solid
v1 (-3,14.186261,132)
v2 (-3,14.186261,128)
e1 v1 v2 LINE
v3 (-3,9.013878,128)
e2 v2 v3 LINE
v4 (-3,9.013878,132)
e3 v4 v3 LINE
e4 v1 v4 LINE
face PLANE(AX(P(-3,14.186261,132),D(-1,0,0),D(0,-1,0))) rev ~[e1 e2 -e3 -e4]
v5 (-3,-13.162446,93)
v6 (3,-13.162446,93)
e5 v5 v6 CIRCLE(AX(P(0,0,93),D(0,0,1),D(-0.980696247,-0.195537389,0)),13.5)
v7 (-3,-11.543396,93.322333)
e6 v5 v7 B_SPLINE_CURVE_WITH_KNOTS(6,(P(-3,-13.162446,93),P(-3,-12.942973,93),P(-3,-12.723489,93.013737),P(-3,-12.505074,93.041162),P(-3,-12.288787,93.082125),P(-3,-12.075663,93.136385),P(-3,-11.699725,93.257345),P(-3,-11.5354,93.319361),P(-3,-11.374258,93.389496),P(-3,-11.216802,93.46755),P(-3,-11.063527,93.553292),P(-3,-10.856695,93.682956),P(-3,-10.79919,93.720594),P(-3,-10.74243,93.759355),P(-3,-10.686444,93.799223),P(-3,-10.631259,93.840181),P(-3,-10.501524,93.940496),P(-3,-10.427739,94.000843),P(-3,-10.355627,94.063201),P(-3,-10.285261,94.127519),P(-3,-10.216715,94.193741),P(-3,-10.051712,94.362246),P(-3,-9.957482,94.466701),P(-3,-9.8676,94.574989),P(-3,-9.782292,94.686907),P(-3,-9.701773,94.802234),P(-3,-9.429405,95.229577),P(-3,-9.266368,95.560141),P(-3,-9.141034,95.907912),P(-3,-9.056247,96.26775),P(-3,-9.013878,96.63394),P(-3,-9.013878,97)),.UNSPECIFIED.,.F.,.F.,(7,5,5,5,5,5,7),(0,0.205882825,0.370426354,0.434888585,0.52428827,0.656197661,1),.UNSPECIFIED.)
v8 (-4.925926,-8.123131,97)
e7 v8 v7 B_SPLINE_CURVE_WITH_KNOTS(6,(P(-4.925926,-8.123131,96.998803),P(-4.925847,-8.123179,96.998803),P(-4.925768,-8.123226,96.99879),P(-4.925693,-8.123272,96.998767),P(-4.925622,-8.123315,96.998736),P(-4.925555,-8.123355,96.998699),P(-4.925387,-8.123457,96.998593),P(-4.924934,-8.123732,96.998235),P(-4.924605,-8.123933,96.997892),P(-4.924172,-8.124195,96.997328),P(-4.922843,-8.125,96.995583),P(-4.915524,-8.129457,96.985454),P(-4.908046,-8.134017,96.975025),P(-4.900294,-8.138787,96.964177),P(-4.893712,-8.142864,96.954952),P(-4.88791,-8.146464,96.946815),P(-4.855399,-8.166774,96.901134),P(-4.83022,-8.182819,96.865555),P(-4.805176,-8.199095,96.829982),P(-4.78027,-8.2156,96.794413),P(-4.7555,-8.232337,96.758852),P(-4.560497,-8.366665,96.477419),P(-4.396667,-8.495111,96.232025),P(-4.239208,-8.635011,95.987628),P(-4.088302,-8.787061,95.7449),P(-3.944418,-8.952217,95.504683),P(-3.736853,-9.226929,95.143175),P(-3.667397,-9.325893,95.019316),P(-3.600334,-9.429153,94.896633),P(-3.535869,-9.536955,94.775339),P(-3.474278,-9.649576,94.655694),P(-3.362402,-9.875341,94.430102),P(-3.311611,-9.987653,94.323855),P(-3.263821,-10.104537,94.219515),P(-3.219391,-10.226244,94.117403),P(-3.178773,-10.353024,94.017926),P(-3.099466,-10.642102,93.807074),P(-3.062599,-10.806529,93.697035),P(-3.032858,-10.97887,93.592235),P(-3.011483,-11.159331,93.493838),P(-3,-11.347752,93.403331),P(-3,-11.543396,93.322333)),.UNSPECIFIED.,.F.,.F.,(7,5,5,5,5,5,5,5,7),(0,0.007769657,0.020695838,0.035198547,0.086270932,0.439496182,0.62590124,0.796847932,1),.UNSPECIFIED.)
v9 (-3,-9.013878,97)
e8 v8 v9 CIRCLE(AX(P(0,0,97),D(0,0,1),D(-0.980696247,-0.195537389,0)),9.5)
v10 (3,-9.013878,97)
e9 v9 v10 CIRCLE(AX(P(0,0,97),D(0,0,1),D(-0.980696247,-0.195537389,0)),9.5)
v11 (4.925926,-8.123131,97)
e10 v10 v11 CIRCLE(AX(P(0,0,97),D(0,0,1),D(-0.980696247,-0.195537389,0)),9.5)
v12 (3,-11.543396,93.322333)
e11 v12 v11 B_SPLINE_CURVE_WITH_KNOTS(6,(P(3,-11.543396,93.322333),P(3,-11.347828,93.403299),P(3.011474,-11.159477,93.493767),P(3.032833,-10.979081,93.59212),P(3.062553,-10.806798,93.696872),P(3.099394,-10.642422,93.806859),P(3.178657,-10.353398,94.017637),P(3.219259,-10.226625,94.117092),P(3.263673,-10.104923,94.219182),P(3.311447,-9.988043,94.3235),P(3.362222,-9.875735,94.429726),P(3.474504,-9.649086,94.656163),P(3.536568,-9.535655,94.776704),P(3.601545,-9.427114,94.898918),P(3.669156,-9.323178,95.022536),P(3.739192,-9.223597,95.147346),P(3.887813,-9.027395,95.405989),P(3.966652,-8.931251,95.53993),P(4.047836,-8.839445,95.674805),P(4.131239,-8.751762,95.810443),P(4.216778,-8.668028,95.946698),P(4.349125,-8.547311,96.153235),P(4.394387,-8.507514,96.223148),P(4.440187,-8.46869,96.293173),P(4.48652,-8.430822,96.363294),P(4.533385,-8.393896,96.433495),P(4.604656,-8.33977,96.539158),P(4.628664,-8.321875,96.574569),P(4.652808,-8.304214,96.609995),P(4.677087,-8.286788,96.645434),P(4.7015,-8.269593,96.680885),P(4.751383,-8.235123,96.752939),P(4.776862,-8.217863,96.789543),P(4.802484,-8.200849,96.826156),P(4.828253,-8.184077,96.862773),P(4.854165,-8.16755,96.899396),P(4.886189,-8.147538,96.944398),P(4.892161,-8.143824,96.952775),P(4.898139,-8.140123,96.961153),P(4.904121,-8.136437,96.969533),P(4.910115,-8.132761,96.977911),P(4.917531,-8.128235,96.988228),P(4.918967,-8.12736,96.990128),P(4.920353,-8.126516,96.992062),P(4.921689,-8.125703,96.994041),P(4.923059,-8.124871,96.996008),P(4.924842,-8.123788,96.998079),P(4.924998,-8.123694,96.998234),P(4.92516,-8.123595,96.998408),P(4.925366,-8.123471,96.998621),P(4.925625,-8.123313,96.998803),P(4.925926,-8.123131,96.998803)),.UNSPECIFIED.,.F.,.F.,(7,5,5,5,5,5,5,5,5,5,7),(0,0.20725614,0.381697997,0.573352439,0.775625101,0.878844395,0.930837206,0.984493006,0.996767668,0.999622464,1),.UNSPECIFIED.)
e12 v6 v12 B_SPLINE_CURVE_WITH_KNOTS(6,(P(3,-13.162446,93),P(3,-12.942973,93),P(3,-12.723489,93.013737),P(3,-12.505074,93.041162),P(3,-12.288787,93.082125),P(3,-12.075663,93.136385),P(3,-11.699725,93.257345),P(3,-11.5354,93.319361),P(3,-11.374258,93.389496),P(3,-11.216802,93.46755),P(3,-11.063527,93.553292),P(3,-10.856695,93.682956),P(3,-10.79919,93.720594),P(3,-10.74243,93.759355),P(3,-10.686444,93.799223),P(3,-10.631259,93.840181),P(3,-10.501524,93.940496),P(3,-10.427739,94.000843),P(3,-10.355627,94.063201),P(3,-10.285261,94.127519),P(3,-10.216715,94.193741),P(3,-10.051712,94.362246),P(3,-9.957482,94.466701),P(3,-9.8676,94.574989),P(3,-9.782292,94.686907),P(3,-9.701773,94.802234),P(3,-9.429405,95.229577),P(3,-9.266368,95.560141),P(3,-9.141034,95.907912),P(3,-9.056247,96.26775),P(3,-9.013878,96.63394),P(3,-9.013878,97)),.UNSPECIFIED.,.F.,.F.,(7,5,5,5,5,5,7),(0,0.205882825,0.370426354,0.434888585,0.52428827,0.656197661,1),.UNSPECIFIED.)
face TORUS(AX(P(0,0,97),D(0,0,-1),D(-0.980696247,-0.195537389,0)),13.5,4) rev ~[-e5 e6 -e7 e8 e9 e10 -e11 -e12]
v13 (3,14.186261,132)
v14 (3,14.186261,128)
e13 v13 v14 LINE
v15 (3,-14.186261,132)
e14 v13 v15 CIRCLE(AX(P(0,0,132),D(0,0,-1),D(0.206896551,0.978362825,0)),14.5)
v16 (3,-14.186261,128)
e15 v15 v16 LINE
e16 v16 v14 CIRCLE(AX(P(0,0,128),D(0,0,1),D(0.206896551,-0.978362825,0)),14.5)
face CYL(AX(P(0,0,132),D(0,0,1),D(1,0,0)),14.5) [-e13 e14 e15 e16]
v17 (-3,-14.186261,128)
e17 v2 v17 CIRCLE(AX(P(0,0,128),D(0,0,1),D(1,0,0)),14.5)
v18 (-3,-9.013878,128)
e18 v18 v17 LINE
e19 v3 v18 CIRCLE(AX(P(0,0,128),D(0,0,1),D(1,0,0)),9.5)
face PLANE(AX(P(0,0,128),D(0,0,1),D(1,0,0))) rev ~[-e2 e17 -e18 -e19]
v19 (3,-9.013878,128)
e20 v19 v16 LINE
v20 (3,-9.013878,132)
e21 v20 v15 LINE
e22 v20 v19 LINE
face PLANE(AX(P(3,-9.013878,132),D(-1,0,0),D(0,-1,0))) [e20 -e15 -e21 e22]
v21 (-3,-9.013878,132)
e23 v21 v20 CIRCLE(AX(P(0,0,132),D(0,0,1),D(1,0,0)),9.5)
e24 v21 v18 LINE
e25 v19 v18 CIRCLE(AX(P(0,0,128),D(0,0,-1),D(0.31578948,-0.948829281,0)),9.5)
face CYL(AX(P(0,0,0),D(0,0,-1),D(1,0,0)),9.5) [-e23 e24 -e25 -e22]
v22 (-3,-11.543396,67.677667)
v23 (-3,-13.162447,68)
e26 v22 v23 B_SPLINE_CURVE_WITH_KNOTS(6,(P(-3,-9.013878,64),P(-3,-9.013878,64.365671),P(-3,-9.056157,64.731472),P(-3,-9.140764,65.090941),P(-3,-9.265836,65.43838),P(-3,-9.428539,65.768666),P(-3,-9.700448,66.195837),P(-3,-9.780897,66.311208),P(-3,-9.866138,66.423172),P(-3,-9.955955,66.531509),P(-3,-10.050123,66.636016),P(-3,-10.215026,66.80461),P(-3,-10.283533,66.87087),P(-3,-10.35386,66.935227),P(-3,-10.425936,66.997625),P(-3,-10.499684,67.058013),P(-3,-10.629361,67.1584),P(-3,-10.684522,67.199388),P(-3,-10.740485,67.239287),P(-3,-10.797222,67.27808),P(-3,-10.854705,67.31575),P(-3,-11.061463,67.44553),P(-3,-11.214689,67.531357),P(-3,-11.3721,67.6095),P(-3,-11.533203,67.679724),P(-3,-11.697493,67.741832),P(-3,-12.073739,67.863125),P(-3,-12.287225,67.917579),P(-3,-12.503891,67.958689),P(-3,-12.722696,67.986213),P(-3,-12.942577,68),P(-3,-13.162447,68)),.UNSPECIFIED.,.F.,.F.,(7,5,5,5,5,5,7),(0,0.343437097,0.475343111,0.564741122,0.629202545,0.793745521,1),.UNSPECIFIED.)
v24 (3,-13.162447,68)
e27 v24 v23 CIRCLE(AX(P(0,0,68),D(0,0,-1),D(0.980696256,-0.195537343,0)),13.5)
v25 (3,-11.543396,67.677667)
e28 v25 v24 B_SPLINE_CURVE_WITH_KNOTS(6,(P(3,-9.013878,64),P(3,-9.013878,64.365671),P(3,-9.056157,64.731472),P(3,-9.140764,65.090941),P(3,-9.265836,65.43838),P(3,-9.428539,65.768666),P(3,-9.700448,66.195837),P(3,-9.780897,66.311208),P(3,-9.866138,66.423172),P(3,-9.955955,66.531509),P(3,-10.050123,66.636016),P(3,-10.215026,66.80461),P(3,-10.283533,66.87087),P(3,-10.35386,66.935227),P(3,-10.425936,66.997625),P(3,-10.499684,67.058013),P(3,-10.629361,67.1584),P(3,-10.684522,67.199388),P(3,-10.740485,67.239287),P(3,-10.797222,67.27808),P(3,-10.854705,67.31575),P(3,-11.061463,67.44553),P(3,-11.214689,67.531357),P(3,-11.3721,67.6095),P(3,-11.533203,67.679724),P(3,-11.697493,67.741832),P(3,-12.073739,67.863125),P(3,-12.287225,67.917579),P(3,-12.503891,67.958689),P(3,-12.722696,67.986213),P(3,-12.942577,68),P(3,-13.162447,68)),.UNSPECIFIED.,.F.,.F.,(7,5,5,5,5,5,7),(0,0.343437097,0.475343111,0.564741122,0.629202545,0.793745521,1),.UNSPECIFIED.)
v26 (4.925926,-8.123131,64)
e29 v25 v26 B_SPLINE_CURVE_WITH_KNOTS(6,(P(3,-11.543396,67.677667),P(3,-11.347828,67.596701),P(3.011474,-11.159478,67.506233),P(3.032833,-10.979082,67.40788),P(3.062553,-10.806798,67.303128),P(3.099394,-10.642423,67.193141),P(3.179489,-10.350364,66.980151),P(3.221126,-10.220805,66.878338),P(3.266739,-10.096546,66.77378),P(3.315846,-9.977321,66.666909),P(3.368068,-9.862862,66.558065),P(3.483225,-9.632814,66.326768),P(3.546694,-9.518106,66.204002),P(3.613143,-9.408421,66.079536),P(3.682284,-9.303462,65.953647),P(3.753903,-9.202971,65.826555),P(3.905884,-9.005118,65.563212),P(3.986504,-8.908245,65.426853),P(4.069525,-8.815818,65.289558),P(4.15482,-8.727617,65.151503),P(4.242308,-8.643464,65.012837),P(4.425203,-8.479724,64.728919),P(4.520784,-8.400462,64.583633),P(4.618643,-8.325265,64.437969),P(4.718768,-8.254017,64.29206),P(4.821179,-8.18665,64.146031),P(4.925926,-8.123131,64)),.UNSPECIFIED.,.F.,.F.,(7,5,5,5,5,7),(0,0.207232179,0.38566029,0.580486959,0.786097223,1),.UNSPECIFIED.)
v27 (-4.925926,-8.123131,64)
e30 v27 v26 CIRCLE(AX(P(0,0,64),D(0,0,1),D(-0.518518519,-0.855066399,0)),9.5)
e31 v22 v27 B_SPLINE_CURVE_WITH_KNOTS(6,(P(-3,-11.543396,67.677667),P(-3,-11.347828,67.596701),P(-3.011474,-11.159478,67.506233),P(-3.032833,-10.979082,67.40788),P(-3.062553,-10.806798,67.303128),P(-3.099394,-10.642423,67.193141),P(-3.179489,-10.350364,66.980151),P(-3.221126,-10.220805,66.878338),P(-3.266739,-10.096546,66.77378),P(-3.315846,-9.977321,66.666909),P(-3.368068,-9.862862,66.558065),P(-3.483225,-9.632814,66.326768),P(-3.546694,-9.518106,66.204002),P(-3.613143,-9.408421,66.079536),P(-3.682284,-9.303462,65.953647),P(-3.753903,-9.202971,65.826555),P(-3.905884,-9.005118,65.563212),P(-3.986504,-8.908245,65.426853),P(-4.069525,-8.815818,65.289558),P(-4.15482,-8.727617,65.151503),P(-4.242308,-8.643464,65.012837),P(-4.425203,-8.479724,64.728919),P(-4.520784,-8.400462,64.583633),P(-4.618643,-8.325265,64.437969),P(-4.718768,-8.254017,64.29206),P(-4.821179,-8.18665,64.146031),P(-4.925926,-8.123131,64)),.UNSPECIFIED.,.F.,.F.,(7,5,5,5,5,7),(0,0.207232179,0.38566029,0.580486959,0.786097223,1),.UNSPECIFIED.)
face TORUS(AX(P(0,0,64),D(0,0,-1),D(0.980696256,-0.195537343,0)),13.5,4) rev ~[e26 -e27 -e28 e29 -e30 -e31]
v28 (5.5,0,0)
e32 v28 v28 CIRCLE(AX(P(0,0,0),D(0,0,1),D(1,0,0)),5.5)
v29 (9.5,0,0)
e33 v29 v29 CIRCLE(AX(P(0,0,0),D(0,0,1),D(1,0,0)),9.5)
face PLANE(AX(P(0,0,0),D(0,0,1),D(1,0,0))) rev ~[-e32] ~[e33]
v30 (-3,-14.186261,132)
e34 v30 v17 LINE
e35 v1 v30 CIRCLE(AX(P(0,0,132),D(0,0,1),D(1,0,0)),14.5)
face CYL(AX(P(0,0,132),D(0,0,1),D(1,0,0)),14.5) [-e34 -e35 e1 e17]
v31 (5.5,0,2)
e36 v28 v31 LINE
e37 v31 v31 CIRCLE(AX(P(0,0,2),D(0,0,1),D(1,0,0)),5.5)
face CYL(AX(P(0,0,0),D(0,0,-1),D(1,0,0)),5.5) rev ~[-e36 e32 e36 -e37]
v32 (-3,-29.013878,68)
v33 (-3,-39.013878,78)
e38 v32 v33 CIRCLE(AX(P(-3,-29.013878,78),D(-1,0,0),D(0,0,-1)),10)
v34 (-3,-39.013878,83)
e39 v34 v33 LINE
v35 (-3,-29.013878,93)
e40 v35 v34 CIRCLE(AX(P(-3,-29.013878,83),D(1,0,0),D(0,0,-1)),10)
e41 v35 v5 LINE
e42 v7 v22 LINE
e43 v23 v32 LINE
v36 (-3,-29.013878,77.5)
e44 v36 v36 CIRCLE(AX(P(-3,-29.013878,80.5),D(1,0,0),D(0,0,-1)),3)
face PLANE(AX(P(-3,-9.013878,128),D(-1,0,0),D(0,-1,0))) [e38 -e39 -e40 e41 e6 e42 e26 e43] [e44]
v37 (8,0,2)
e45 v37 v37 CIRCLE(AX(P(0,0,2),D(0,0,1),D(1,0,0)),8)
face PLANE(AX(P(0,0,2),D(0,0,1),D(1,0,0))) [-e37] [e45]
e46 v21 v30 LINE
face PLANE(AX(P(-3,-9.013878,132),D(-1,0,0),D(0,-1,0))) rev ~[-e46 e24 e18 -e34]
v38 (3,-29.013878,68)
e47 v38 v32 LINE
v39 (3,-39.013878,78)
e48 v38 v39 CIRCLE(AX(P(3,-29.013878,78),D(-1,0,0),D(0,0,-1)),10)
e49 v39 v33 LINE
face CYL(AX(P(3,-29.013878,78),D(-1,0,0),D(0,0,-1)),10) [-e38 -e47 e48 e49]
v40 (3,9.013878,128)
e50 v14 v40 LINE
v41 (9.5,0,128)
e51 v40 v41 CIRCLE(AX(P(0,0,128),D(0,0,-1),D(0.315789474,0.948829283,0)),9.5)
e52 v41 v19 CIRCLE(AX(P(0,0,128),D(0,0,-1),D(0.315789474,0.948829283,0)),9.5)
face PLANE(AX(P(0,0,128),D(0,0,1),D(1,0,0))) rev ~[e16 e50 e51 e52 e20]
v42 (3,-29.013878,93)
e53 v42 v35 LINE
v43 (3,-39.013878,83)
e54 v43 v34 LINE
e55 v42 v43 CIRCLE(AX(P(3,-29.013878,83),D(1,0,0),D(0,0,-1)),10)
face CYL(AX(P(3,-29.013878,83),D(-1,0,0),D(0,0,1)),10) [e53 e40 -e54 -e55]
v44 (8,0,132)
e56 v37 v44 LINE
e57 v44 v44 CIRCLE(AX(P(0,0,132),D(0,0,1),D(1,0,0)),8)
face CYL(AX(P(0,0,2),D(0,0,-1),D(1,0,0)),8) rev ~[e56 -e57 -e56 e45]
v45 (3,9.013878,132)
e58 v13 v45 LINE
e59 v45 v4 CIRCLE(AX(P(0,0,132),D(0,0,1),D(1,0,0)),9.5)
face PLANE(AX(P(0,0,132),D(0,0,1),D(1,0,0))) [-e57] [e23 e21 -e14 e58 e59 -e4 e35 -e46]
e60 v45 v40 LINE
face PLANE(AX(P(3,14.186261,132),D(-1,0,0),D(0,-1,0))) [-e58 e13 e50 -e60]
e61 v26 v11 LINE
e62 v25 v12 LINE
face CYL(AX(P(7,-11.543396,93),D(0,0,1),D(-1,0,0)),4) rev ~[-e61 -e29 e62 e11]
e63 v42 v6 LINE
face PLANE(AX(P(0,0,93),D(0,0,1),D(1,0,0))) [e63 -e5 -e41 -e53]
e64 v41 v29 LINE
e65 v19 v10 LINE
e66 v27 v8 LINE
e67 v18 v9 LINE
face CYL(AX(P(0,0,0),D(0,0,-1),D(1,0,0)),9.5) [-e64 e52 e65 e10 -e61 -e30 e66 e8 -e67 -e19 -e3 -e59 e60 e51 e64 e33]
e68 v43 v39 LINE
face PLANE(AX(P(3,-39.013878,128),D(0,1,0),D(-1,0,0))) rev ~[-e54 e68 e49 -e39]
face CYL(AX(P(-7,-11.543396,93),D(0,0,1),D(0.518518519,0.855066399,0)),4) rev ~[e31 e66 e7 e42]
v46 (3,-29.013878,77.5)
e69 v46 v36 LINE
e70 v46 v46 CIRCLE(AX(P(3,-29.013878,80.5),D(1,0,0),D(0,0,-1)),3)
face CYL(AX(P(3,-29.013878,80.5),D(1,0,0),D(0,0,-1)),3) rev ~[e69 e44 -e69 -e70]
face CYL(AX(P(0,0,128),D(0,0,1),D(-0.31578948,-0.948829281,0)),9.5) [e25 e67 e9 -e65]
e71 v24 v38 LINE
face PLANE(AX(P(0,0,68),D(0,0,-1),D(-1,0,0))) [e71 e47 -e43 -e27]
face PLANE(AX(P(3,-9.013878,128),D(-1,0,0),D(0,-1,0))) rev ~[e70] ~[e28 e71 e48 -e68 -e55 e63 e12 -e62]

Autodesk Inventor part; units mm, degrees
ref_plane "YZ Plane" through (0, 0, 0) normal (1, 0, 0) x (0, 1, 0)
ref_plane "XZ Plane" through (0, 0, 0) normal (0, 1, 0) x (-1, 0, 0)
ref_plane "XY Plane" through (0, 0, 0) normal (0, 0, 1) x (1, 0, 0)
sketch "Boceto2" plane through (0, 0, 0) normal (0, 0, 1) x (1, 0, 0)
  circle A0 centre (0, 0) radius 9.5
  circle A1 centre (0, 0) radius 5.5
extrude "Extrusión1" add sketch "Boceto2" along normal blind 2
sketch "Boceto3" plane through (0, 0, 2) normal (0, 0, 1) x (1, 0, 0)
  circle A0 centre (0, 0) radius 9.5
  circle A1 centre (0, 0) radius 8
  dimension "d5" = 16
extrude "Extrusión2" add sketch "Boceto3" along normal blind 130
sketch "Boceto4" plane through (0, 0, 132) normal (0, 0, 1) x (1, 0, 0)
  circle A0 centre (0, 0) radius 9.5
  circle A1 centre (0, 0) radius 8
  circle A2 centre (0, 0) radius 14.5
  line L0 (3, 14.186261) -> (3, -14.186261)
  line L1 (-3, 14.186261) -> (-3, -14.186261)
  point P0 (3, 0)
  point P1 (-3, 0)
  point P2 (-3, 9.013878)
  point P3 (-3, -9.013878)
  point P4 (3, -9.013878)
  point P5 (3, 9.013878)
  dimension "d36" = 19
  dimension "d37" = 5
  dimension "d38" = 3
  dimension "d39" = 3
extrude "Extrusión3" add sketch "Boceto4" against normal blind 4 contours A0 L0 A2 | A0 L1 A2
sketch "Boceto5" plane through (0, 0, 128) normal (0, 0, -1) x (-1, 0, 0)
  line L0 (9.380832, 1.5) -> (10.897247, 1.5)
  line L1 (-9.380832, 1.5) -> (-10.897247, 1.5)
  line L2 (-9.380832, -1.5) -> (-10.897247, -1.5)
  line L3 (9.380832, -1.5) -> (10.897247, -1.5)
  arc A0 (-9.380832, 1.5) -> (-9.380832, -1.5) centre (0, 0) ccw
  arc A1 (9.380832, -1.5) -> (9.380832, 1.5) centre (0, 0) ccw
  line L4 (-10.897247, 1.5) -> (-12.409674, 1.5)
  line L5 (-10.897247, -1.5) -> (-12.409674, -1.5)
  line L6 (10.897247, 1.5) -> (12.409674, 1.5)
  line L7 (10.897247, -1.5) -> (12.409674, -1.5)
  arc A2 (-12.409674, 1.5) -> (-12.409674, -1.5) centre (0, 0) ccw
  arc A3 (12.409674, -1.5) -> (12.409674, 1.5) centre (0, 0) ccw
extrude "Extrusión4" [suppressed]
sketch "Boceto6" plane through (0, 0, 128) normal (0, 0, -1) x (-1, 0, 0)
  arc A0 (-3, -9.013878) -> (3, -9.013878) centre (0, 0) ccw
  line L0 (-2.5, -20.682789) -> (-2.5, -15.634719)
  line L1 (-3, -9.013878) -> (-3, -39.013878)
  line L2 (3, -9.013878) -> (3, -39.013878)
  line L3 (-3, -39.013878) -> (3, -39.013878)
  point P0 (-1.5, -10.897247)
  point P1 (-1.5, -9.380832)
extrude "Extrusión5" add sketch "Boceto6" along normal blind 60
sketch "Boceto7" plane through (0, 0, 128) normal (0, 0, 1) x (1, 0, 0)
  line L0 (-3, -39.013878) -> (-3, -9.013878)
  line L1 (-3, -9.013878) -> (-3, -39.013878)
  line L2 (3, -39.013878) -> (-3, -39.013878)
  line L3 (-3, -39.013878) -> (3, -39.013878)
  arc A0 (-3, -9.013878) -> (3, -9.013878) centre (0, 0) ccw
  line L4 (3, -39.013878) -> (3, -9.013878)
  circle A1 centre (0, 0) radius 9.5
extrude "Extrusión6" cut sketch "Boceto7" against normal blind 35 contours L0 A0 L4 L2
fillet "Empalme1" radius 10 2 edges at (0, -39.0139, 93) (0, -39.0139, 68)
fillet "Empalme2" radius 4 4 edges at (0, -9.5, 93) (3, -9.0139, 80.5) (-3, -9.0139, 80.5) (0, -9.5, 68)
sketch "Boceto8" plane through (3, -39.013878, 83) normal (1, 0, 0) x (0, 0, -1)
  arc A0 (-10, 10) -> (0, 0) centre (0, 10) ccw projected
  circle A1 centre (2.5, 10) radius 3
  point P0 (83, 39.013878)
  point P1 (15, 10)
extrude "Extrusión7" cut sketch "Boceto8" against normal blind 6
properties part number "Tubo"
